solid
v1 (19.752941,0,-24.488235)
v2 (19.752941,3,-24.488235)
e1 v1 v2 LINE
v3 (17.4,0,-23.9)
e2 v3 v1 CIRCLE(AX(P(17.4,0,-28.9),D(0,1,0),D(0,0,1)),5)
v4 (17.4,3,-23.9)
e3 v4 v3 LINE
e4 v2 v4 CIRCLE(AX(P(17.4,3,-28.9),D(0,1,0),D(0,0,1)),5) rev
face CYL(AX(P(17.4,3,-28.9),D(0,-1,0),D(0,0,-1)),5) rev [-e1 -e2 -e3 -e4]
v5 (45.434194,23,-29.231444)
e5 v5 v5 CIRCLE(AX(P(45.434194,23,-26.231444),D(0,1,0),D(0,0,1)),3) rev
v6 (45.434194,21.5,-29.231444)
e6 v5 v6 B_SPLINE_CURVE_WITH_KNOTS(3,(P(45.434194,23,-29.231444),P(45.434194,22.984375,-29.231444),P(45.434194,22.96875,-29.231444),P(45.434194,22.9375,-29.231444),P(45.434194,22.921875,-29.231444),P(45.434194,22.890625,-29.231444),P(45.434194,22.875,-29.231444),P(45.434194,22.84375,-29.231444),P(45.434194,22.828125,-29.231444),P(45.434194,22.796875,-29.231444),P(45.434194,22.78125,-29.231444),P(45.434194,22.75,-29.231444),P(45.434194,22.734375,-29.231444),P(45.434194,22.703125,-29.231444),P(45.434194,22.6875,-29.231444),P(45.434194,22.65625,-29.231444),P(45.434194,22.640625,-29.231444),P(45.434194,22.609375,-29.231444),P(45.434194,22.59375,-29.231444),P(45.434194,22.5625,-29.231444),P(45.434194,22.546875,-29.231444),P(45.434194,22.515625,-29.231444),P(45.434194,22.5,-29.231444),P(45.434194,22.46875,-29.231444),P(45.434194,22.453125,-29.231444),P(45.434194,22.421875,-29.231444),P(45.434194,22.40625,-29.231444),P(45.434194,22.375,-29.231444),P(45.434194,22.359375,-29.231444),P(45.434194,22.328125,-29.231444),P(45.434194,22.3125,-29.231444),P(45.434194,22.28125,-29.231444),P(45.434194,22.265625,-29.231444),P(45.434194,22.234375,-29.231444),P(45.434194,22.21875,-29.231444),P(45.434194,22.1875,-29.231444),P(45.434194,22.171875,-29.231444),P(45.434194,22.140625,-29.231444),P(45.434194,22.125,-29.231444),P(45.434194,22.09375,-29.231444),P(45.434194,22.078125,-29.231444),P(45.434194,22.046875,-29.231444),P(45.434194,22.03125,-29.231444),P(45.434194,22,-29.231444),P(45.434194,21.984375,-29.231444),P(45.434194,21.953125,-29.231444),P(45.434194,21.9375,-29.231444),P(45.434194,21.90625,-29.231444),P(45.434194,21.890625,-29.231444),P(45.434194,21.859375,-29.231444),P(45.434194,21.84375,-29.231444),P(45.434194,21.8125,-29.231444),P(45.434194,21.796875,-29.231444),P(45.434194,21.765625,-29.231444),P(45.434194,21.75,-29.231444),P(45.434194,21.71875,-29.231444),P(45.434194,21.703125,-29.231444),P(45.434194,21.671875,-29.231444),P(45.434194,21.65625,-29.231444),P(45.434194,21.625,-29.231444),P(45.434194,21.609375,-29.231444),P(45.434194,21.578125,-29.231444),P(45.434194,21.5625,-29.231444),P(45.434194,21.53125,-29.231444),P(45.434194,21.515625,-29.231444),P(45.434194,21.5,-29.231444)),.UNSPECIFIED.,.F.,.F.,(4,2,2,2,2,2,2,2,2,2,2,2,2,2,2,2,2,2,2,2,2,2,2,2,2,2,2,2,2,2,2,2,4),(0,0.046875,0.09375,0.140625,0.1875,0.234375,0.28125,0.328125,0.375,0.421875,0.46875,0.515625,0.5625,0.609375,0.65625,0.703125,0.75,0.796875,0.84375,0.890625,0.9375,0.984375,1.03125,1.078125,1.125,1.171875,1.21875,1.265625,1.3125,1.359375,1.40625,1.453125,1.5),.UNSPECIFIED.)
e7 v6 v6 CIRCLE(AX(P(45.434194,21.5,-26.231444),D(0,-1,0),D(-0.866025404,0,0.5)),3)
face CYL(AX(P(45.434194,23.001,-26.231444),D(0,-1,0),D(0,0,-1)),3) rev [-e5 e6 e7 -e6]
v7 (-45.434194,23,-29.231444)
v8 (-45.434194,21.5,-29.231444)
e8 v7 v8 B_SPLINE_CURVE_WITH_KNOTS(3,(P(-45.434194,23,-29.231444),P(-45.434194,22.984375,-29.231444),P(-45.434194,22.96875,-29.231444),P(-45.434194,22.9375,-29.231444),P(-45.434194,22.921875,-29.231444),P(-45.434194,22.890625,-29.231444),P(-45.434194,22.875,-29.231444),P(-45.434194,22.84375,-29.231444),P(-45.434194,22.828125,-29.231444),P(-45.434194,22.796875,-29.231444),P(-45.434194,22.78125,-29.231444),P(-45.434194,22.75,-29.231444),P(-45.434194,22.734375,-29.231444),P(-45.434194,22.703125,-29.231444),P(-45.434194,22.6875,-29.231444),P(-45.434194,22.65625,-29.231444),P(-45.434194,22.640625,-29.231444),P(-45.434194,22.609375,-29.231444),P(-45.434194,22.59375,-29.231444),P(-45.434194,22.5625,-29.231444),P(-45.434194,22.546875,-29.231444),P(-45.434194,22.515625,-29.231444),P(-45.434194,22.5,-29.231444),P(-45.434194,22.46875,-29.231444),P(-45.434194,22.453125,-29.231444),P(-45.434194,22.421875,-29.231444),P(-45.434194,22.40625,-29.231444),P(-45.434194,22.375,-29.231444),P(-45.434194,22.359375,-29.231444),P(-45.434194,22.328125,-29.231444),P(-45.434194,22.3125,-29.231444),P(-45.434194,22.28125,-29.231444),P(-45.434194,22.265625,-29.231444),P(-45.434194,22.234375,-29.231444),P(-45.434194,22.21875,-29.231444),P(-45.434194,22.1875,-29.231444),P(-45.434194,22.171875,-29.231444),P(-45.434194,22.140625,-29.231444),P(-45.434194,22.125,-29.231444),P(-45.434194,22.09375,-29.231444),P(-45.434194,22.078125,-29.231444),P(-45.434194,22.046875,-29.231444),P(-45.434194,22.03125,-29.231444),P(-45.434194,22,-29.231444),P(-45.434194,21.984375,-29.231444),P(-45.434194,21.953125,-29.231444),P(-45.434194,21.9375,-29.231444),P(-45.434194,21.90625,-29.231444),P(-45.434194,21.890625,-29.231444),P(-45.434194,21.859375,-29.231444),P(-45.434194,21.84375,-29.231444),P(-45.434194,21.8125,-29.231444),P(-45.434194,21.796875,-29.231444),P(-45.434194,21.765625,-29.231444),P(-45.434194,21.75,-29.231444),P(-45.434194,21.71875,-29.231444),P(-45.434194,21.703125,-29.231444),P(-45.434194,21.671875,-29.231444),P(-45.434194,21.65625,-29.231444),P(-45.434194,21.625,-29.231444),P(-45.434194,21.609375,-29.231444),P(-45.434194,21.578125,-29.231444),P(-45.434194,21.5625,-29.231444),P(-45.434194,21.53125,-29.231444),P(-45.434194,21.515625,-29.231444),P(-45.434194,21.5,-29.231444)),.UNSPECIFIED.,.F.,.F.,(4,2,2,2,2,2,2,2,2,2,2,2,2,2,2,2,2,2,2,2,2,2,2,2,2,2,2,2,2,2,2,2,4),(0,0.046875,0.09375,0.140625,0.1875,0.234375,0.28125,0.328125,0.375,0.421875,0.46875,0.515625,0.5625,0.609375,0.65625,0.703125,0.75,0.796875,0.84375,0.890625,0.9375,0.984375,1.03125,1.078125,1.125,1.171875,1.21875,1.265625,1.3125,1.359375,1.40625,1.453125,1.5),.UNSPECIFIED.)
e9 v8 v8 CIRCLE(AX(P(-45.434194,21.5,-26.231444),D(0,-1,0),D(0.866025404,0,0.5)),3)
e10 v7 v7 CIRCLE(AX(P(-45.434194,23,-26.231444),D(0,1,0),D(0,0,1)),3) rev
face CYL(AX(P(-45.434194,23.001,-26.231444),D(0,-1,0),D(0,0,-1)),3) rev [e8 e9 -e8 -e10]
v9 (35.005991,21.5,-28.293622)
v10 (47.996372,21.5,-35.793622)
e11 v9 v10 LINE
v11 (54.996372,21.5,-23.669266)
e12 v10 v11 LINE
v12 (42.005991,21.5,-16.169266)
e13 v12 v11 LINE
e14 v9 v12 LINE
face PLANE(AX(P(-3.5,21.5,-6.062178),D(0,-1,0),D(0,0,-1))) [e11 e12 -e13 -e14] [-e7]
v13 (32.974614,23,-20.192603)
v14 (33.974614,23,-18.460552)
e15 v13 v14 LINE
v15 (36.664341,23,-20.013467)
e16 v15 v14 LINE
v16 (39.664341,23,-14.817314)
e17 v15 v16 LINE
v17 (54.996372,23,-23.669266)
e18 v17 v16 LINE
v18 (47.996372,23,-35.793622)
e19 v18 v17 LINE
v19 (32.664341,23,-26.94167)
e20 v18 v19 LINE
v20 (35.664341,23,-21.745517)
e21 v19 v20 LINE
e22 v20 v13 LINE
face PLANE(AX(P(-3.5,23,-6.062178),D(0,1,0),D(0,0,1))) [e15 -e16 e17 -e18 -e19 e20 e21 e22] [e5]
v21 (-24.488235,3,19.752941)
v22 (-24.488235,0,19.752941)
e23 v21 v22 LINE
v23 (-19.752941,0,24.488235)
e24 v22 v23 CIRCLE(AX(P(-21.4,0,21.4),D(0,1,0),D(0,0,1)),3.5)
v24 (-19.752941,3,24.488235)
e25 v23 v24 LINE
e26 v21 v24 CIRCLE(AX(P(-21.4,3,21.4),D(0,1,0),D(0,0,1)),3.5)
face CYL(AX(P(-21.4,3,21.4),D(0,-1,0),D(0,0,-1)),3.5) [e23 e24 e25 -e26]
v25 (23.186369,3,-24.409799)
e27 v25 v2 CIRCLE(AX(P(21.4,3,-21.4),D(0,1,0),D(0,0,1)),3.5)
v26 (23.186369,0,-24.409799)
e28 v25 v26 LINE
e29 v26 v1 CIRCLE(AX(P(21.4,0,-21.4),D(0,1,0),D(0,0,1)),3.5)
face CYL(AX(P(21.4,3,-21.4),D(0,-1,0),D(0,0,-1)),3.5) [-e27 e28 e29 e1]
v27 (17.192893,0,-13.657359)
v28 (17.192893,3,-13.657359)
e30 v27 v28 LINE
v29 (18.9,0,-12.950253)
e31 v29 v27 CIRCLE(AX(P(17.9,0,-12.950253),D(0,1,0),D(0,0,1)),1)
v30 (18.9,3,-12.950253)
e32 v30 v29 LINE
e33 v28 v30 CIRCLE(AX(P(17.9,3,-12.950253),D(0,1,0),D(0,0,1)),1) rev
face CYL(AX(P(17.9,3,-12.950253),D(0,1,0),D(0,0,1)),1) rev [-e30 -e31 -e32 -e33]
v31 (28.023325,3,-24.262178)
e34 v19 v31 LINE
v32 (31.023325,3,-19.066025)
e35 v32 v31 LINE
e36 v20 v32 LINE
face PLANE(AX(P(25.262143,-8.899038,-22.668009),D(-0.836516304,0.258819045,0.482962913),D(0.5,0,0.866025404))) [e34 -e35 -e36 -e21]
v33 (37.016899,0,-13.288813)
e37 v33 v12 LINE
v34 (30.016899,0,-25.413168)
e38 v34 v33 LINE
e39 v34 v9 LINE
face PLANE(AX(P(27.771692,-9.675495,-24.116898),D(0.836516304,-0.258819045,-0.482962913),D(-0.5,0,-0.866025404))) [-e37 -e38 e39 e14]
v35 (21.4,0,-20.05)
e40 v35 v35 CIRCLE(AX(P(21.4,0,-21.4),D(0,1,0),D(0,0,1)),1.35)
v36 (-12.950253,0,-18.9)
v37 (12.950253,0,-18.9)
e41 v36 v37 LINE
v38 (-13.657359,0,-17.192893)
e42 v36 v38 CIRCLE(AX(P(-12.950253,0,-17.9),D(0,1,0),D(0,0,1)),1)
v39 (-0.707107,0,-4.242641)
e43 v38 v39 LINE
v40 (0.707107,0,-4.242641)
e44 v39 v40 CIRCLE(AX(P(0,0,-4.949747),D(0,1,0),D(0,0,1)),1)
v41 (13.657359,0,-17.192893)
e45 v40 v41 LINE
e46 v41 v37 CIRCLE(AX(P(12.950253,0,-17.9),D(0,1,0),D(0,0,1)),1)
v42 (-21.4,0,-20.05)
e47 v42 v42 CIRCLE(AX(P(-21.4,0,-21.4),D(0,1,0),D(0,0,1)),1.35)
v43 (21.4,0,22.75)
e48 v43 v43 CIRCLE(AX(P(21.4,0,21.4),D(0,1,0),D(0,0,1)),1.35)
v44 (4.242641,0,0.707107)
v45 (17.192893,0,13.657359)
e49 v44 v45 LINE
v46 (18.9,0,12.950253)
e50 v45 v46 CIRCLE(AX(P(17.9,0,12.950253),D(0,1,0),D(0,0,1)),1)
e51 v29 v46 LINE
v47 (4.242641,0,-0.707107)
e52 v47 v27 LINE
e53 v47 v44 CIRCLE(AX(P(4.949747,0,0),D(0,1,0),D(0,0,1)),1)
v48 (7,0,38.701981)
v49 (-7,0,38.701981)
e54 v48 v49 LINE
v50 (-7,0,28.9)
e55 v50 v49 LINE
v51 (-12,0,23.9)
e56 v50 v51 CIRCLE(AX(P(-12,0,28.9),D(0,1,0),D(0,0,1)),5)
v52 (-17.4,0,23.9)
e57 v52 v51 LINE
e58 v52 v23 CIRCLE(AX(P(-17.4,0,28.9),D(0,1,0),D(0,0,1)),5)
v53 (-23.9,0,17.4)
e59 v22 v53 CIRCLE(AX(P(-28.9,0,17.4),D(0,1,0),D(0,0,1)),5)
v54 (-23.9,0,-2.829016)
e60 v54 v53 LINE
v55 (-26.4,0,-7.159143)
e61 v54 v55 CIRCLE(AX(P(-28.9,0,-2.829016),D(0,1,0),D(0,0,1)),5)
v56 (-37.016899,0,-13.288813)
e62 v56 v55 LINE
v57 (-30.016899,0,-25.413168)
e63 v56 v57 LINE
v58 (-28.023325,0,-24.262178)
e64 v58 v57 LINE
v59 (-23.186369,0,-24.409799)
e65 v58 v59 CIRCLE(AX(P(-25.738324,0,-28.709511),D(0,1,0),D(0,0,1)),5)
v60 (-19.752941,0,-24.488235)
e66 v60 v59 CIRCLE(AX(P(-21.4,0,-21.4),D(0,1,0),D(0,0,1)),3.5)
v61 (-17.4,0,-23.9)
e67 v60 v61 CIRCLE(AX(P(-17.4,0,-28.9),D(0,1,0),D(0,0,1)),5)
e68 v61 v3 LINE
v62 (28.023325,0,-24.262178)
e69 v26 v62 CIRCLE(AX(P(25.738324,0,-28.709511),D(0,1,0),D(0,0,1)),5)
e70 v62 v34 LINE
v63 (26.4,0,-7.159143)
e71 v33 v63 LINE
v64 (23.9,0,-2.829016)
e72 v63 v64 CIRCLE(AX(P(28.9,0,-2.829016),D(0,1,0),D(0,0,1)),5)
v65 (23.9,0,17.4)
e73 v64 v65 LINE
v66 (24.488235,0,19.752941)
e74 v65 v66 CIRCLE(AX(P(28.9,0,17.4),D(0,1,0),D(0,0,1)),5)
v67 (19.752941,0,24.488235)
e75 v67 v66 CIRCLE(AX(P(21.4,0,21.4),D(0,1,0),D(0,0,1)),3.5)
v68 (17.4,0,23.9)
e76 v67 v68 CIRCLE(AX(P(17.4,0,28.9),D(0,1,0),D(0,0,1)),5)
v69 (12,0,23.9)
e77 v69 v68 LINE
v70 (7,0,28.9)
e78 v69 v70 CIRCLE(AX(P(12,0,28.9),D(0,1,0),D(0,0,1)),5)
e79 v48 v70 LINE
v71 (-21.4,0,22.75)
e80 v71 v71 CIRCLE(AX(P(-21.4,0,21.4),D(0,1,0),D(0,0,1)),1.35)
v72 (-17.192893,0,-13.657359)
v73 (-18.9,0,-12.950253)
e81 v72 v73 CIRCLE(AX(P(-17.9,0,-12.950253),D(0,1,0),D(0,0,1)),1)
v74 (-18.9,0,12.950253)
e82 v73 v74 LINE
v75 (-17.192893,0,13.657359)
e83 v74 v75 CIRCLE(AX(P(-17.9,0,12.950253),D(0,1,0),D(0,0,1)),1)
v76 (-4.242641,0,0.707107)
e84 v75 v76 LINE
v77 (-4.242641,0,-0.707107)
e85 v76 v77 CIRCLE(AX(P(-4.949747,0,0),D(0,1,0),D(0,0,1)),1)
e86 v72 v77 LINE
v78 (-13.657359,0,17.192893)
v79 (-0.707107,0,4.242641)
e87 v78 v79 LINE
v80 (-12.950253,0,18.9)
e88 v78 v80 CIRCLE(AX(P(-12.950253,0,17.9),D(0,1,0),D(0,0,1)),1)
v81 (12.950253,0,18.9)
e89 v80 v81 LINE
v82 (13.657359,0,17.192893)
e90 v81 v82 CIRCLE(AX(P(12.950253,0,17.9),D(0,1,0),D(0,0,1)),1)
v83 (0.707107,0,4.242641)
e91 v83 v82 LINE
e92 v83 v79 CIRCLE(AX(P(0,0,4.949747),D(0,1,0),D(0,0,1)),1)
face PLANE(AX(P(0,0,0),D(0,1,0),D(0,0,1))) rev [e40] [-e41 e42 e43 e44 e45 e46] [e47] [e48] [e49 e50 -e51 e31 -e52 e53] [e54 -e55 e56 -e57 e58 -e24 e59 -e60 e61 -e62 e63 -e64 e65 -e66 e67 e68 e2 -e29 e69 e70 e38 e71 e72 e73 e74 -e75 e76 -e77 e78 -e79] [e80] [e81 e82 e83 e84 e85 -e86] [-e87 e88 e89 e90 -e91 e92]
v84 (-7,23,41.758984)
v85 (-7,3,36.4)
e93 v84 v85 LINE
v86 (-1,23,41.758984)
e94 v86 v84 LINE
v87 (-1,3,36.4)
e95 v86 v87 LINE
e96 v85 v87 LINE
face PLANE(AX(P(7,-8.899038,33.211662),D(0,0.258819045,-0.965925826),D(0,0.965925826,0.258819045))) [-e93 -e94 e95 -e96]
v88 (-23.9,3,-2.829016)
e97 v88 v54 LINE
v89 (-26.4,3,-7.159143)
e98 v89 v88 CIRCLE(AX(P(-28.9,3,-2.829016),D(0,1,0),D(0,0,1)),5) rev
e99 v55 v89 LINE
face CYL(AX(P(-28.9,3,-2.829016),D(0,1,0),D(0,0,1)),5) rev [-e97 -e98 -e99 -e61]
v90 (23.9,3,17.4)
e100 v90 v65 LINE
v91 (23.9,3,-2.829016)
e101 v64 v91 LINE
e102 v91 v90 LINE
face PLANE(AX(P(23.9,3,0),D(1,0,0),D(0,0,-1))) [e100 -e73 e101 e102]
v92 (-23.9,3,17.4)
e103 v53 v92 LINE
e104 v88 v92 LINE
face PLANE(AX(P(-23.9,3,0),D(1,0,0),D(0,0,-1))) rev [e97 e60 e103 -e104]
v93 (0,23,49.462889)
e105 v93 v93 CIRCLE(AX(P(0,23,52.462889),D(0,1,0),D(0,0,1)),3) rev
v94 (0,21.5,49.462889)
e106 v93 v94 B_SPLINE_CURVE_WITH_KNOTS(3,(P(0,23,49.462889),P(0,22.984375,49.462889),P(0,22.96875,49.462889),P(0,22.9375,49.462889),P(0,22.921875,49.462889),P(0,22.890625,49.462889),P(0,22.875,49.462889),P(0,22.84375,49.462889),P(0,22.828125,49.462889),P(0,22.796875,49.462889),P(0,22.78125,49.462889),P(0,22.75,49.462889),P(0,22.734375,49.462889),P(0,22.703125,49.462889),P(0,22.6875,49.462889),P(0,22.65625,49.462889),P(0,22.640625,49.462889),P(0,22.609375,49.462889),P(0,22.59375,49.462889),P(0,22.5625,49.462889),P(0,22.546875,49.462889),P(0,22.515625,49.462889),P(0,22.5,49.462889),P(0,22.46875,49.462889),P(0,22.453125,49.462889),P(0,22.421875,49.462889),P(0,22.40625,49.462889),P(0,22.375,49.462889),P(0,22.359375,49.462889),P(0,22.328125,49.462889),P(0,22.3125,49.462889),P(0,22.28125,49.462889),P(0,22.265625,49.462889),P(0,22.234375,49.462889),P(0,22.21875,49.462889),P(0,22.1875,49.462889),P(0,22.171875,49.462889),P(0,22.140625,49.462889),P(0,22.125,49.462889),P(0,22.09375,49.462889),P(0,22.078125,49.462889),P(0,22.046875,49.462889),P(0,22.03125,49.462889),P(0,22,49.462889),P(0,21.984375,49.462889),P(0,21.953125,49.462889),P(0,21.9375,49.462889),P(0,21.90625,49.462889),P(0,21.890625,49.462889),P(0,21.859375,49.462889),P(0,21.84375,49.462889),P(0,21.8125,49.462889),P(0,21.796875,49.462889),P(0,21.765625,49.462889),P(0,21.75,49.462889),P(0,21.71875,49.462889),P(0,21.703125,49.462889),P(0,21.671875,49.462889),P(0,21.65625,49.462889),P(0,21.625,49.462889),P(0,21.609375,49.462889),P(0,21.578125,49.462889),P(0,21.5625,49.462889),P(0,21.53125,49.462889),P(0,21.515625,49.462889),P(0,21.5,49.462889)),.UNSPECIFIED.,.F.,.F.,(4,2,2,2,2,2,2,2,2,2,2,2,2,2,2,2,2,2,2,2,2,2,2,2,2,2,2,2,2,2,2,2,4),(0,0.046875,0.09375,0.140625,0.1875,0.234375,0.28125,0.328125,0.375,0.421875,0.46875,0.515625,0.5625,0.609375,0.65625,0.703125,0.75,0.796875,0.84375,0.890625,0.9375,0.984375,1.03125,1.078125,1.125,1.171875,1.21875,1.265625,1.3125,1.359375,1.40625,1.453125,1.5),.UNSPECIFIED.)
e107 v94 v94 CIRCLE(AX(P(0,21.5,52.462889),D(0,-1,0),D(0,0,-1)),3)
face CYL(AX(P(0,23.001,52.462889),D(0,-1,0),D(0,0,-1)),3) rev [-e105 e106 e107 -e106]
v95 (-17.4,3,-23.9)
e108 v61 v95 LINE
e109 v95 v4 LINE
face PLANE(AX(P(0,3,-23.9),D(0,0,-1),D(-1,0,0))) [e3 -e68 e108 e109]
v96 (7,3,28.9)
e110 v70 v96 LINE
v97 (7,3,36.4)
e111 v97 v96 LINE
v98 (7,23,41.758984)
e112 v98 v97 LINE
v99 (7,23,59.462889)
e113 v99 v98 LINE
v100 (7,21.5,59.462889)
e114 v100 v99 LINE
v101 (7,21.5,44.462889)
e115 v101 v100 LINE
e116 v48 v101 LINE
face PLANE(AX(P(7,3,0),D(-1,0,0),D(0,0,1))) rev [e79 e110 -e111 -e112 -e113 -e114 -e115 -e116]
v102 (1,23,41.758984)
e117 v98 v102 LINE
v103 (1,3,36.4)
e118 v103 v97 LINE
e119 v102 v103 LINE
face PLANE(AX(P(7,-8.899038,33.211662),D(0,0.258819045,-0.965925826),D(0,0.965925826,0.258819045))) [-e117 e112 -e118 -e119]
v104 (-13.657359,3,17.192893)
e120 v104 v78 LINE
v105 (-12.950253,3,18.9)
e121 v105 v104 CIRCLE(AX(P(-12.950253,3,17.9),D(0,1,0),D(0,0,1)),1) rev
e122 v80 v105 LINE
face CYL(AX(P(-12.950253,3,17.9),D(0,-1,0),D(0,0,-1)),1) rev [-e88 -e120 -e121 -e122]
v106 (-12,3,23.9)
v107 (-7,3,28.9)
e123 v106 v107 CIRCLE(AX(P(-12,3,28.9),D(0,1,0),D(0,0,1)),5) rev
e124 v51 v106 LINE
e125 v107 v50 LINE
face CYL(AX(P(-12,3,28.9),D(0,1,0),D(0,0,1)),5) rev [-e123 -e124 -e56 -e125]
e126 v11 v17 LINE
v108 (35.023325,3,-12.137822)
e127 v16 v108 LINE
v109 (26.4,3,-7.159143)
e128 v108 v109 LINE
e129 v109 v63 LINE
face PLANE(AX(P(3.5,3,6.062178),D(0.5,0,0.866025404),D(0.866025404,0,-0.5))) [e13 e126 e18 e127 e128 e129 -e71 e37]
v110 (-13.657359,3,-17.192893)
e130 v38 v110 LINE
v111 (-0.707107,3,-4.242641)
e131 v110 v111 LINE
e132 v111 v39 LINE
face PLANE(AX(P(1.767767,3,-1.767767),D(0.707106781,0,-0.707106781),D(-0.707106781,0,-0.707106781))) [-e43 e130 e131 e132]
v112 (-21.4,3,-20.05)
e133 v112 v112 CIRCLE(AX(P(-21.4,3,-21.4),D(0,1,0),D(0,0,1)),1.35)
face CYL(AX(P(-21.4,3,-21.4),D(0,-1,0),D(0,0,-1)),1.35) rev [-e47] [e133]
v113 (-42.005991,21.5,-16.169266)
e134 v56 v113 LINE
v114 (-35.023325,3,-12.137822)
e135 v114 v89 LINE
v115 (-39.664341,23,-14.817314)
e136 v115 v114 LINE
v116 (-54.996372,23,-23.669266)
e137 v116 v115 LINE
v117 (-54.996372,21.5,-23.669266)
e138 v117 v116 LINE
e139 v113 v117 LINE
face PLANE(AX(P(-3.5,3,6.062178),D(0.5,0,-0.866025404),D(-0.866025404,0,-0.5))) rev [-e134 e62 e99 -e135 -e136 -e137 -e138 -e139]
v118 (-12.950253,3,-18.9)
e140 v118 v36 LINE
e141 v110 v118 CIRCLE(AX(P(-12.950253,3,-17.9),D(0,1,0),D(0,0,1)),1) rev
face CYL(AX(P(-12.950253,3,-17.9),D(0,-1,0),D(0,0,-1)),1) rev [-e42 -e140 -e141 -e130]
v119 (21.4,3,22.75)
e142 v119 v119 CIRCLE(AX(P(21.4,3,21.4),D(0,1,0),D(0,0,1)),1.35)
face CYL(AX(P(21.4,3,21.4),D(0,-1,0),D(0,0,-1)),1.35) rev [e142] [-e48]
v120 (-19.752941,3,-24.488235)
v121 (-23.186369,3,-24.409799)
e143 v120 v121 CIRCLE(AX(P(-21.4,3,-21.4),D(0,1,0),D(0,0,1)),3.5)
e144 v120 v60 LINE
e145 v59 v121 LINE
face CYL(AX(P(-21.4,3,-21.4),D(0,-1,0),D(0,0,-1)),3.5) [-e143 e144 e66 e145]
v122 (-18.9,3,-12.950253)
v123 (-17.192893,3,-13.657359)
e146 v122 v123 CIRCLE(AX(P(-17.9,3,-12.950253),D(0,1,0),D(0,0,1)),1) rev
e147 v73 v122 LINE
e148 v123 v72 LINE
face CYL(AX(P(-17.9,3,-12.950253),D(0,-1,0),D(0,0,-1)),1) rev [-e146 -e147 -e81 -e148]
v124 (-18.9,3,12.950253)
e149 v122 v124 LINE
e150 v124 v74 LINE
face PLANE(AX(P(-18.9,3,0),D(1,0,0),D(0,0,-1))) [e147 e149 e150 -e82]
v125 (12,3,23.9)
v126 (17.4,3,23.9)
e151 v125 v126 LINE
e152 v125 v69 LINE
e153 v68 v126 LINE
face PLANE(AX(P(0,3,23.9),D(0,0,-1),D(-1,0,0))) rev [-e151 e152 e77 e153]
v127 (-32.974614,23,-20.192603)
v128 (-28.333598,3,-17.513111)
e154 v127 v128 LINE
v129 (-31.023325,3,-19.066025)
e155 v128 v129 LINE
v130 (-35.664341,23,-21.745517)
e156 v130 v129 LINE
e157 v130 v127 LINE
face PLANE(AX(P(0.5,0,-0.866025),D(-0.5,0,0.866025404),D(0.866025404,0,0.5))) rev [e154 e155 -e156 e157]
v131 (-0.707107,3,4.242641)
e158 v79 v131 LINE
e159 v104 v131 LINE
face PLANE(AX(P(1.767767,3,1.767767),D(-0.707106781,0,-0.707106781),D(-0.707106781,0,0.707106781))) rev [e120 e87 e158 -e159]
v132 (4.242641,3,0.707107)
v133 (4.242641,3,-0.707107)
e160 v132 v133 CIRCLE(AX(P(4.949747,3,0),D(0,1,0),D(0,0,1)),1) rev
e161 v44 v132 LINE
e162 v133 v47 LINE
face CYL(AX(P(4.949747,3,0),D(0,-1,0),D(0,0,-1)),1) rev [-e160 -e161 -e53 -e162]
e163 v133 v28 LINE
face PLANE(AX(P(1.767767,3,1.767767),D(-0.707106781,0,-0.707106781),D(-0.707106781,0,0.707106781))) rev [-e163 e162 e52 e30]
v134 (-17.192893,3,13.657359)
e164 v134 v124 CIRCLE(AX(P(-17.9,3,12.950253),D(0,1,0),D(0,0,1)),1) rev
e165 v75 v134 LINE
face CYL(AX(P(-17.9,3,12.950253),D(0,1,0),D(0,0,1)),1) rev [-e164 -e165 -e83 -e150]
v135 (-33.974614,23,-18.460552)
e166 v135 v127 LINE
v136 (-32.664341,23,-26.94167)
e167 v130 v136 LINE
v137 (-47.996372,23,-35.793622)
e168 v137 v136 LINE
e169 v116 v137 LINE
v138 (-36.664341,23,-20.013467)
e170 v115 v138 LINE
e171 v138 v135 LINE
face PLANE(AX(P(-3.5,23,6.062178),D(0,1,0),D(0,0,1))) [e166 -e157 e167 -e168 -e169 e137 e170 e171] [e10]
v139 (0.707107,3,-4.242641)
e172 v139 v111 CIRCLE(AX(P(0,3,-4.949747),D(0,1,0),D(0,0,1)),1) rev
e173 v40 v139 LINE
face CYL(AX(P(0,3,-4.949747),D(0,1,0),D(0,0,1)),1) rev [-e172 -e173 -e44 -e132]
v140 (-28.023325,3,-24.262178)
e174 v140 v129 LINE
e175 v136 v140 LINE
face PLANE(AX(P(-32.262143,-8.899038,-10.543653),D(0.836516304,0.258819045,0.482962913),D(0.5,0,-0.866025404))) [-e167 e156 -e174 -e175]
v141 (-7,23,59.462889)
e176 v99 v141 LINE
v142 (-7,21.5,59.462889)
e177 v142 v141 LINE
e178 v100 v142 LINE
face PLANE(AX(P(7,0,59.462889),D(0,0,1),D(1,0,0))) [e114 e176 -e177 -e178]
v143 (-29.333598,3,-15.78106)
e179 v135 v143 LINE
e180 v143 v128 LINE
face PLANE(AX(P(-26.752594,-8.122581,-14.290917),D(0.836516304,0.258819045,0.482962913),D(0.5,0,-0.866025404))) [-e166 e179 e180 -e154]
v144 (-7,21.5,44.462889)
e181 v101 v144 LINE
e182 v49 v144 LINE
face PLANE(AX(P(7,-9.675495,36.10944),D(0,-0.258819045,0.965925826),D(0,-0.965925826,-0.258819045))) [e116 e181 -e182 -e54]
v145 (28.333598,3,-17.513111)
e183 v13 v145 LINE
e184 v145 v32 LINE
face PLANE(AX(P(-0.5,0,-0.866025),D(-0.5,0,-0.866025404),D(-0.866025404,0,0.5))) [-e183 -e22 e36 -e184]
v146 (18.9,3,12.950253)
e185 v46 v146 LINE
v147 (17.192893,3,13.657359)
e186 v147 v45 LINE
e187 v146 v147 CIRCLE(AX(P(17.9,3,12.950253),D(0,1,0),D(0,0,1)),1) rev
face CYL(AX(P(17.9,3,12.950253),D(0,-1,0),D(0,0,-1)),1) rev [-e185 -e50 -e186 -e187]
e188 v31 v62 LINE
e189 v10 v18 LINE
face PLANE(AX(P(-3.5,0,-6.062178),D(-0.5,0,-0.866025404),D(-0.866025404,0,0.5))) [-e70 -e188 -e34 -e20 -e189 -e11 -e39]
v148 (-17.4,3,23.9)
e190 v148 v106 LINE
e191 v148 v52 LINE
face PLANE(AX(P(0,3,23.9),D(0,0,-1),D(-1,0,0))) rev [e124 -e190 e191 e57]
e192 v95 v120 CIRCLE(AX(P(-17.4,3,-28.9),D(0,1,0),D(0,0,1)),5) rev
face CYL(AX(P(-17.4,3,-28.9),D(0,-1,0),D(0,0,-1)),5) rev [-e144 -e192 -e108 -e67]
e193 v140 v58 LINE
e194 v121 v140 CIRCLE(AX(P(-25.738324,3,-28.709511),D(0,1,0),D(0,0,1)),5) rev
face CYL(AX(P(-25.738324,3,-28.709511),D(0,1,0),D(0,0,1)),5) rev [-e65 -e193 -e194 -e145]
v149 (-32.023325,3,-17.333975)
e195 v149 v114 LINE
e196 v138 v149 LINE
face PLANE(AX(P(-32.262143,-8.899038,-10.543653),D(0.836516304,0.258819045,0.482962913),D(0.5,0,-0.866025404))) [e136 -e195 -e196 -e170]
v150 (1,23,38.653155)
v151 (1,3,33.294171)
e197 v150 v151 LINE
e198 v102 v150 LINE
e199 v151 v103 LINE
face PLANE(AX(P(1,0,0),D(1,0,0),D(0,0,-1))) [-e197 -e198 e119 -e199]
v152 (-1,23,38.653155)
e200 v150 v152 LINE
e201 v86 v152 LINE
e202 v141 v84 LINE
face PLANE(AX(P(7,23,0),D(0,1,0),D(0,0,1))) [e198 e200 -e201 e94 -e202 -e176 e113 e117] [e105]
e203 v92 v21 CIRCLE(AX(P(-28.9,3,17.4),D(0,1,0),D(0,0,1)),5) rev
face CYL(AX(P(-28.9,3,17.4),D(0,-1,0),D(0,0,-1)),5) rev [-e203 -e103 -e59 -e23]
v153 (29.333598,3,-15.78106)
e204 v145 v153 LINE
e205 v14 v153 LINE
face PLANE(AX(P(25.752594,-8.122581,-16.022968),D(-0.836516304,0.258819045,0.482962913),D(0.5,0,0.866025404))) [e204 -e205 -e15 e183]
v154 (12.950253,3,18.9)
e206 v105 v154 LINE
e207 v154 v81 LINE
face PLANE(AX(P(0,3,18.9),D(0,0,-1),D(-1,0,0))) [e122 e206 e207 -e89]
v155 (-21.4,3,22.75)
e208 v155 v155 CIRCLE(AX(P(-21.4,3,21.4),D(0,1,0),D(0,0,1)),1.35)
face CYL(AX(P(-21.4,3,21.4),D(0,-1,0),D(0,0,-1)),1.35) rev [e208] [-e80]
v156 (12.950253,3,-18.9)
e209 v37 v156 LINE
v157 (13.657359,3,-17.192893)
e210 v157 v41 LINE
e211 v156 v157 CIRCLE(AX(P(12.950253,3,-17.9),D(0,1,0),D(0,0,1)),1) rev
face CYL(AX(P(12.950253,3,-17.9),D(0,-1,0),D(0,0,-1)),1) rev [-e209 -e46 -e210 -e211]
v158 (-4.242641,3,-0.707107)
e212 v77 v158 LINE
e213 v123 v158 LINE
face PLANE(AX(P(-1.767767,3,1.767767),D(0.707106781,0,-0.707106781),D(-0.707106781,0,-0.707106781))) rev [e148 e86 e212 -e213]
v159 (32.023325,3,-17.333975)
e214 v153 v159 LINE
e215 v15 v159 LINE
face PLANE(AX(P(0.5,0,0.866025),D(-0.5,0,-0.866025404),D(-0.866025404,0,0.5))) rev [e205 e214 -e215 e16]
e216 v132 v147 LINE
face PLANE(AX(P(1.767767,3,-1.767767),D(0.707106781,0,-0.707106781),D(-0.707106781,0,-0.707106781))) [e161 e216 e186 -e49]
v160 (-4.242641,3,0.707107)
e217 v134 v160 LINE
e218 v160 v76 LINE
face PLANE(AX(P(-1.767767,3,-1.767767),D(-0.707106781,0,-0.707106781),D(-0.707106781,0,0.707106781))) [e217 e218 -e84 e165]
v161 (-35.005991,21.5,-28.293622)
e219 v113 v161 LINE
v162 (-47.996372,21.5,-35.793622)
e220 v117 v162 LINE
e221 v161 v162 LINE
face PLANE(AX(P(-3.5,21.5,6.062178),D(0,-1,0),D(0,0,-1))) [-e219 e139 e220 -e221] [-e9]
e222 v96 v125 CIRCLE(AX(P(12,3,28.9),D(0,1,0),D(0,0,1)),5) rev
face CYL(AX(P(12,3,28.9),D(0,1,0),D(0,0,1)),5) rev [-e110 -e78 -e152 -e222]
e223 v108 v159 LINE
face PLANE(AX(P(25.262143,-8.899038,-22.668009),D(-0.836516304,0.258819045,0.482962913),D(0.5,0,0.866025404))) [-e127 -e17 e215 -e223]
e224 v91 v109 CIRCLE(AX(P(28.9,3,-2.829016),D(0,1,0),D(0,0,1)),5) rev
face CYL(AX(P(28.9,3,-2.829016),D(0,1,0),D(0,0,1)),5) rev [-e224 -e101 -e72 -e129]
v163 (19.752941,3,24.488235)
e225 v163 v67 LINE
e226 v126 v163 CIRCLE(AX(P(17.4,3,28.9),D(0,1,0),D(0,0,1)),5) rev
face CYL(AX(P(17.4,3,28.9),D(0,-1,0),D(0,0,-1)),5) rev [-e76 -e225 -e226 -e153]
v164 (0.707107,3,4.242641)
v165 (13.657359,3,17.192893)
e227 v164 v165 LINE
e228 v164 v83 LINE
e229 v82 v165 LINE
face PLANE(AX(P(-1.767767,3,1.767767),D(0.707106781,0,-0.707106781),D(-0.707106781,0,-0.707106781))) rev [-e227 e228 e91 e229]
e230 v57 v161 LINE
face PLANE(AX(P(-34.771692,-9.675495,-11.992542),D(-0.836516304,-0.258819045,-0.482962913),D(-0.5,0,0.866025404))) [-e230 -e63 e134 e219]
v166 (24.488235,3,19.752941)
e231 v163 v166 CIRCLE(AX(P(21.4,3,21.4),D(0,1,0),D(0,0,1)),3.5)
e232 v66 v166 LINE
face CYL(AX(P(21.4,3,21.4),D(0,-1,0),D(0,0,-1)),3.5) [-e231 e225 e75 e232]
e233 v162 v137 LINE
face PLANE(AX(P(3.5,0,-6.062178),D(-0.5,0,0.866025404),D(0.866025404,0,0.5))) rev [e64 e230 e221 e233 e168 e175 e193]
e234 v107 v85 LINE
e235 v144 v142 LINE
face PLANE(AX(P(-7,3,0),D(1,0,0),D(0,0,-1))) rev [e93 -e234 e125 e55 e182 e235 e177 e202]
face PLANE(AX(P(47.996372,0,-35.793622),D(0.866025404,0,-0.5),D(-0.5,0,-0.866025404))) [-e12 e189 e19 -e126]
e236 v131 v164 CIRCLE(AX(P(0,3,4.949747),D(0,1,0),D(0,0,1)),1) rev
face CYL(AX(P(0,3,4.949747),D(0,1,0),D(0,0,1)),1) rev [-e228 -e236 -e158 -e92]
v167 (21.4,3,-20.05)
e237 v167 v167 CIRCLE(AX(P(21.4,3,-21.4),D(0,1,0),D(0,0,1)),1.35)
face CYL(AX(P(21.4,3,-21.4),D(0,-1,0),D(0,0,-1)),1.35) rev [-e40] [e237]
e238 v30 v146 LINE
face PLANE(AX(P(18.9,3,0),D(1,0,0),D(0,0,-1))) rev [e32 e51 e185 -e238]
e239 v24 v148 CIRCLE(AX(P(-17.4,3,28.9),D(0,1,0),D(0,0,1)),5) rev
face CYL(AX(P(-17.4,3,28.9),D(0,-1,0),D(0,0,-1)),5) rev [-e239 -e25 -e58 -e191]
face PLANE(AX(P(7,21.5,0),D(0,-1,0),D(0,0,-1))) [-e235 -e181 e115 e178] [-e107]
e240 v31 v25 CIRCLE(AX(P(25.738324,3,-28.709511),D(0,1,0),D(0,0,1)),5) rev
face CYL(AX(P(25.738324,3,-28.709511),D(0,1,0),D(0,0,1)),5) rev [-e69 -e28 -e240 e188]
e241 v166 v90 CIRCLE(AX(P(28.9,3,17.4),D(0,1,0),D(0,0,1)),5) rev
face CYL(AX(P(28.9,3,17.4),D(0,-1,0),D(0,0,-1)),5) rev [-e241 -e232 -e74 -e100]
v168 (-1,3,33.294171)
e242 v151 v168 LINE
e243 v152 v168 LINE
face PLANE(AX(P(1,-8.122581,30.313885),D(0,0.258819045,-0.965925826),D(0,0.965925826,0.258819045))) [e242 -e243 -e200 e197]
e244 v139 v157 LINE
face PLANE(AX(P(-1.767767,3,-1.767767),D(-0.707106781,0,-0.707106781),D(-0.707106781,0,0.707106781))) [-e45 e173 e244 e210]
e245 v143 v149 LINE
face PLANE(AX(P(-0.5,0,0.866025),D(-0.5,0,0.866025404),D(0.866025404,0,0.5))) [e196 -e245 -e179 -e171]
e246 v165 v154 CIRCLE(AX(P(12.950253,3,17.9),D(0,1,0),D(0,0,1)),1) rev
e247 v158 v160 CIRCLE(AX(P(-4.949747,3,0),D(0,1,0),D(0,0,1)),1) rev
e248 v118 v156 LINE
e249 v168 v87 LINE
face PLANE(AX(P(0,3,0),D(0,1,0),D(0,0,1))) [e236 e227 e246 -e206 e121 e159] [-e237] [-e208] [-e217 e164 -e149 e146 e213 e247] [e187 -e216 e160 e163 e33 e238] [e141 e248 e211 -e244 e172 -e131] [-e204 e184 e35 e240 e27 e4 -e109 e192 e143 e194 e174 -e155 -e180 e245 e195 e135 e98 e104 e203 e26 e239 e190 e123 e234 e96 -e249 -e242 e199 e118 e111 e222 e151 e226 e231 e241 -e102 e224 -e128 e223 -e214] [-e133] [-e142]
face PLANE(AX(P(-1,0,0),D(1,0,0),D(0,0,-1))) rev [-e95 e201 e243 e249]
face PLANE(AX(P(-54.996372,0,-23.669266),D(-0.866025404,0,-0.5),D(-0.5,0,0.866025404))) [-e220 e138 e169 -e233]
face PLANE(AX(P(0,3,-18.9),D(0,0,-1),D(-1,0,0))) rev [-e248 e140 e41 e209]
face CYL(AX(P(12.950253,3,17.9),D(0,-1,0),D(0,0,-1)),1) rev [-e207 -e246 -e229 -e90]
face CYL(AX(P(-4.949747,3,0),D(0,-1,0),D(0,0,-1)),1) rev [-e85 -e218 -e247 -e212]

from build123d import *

# Parameters (mm, degrees)
SKETCH1_R           = 1.35
BOSS_EXTRUDE1_DEPTH = 3
FILLET1_R           = 5
FILLET2_R           = 1
BOSS_EXTRUDE2_DEPTH = 7
BOSS_EXTRUDE3_DEPTH = 1
CUT_EXTRUDE1_REACH  = 74.282
SKETCH3_R           = 3
CIRPATTERN3_COUNT   = 3


with BuildPart() as part:
    # Sketch1 → Boss-Extrude1 (new body)
    with BuildSketch(Plane(origin=(0, 0, 0), x_dir=(1, 0, 0), z_dir=(0, 1, 0))):
        with BuildLine():
            ThreePointArc((-18.950510257, 23.9), (-22.286742625, 24.785806775), (-24.760474821, 22.378370572))
            Line((-24.760474821, 22.378370572), (-28.023324698, 24.262177826))
            Line((-28.023324698, 24.262177826), (-35.023324698, 12.137822174))
            Line((-35.023324698, 12.137822174), (-23.9, 5.715767665))
            Line((-23.9, 5.715767665), (-23.9, -18.950510257))
            ThreePointArc((-23.9, -18.950510257), (-23.874873734, -23.874873734), (-18.950510257, -23.9))
            Line((-18.950510257, -23.9), (-7, -23.9))
            Line((-7, -23.9), (-7, -36.4))
            Line((-7, -36.4), (7, -36.4))
            Line((7, -36.4), (7, -23.9))
            Line((7, -23.9), (18.950510257, -23.9))
            ThreePointArc((18.950510257, -23.9), (23.874873734, -23.874873734), (23.9, -18.950510257))
            Line((23.9, -18.950510257), (23.9, 5.715767665))
            Line((23.9, 5.715767665), (35.023324698, 12.137822174))
            Line((35.023324698, 12.137822174), (28.023324698, 24.262177826))
            Line((28.023324698, 24.262177826), (24.760474821, 22.378370572))
            ThreePointArc((24.760474821, 22.378370572), (22.286742625, 24.785806775), (18.950510257, 23.9))
            Line((18.950510257, 23.9), (-18.950510257, 23.9))
        make_face()
        with Locations(Location((-21.4, -21.4, 0), (0, 0, 270))):
            Circle(SKETCH1_R, mode=Mode.SUBTRACT)
        Polygon((15.364466094, -18.9), (-15.364466094, -18.9), (0, -3.535533906), align=None, mode=Mode.SUBTRACT)
        with Locations(Location((21.4, -21.4, 0), (0, 0, 270))):
            Circle(SKETCH1_R, mode=Mode.SUBTRACT)
        Polygon((-3.535533906, 0), (-18.9, -15.364466094), (-18.9, 15.364466094), align=None, mode=Mode.SUBTRACT)
        with Locations(Location((-21.4, 21.4, 0), (0, 0, 270))):
            Circle(SKETCH1_R, mode=Mode.SUBTRACT)
        Polygon((18.9, -15.364466094), (3.535533906, 0), (18.9, 15.364466094), align=None, mode=Mode.SUBTRACT)
        Polygon((0, 3.535533906), (-15.364466094, 18.9), (15.364466094, 18.9), align=None, mode=Mode.SUBTRACT)
        with Locations(Location((21.4, 21.4, 0), (0, 0, 270))):
            Circle(SKETCH1_R, mode=Mode.SUBTRACT)
    extrude(amount=BOSS_EXTRUDE1_DEPTH)

    # Fillet1
    # the kernel refuses this fillet: 5 mm, written as the material it adds along each edge
    with BuildSketch(Plane(origin=(7, 0, 23.9), x_dir=(0, 0, 1), z_dir=(0, 1, 0)), Plane(origin=(-7, 0, 23.9), x_dir=(-1, 0, 0), z_dir=(0, 1, 0))) as fillet1_piece_1:
        with BuildLine():
            CenterArc((FILLET1_R, FILLET1_R), FILLET1_R, 180, 90)
            Line((0, FILLET1_R), (-FILLET1_R * 0.02, FILLET1_R))
            Line((-FILLET1_R * 0.02, FILLET1_R), (-FILLET1_R * 0.02, -FILLET1_R * 0.02))
            Line((-FILLET1_R * 0.02, -FILLET1_R * 0.02), (FILLET1_R, -FILLET1_R * 0.02))
            Line((FILLET1_R, -FILLET1_R * 0.02), (FILLET1_R, 0))
        make_face()
    extrude(amount=3)
    with BuildSketch(Plane(origin=(23.9, 0, 18.950510257), x_dir=(0.5912237553807399, 0, 0.8065075765753815), z_dir=(0, 1, 0)), Plane(origin=(-18.950510257, 0, 23.9), x_dir=(-0.806507576575308, 0, 0.5912237553808403), z_dir=(0, 1, 0)), Plane(origin=(18.950510257, 0, -23.9), x_dir=(0.8065075765752107, 0, -0.591223755380973), z_dir=(0, 1, 0))) as fillet1_piece_2:
        with BuildLine():
            CenterArc((1.705620507, 4.94923638), FILLET1_R, 233.756102233, 28.072486936)
            Line((-1.25049827, 0.916698497), (-1.309620646, 0.836047739))
            Line((-1.309620646, 0.836047739), (-0.059122376, -0.080650758))
            Line((-0.059122376, -0.080650758), (0.014213504, -0.098984728))
            ThreePointArc((0.014213504, -0.098984728), (0.497472648, -0.064465466), (0.980731791, -0.098984728))
            Line((0.980731791, -0.098984728), (0.994945296, 0))
        make_face()
    extrude(amount=3)
    with BuildSketch(Plane(origin=(18.950510257, 0, 23.9), x_dir=(-1, 0, 0), z_dir=(0, 1, 0)), Plane(origin=(-23.9, 0, 18.950510257), x_dir=(0, 0, -1), z_dir=(0, 1, 0)), Plane(origin=(-18.950510257, 0, -23.9), x_dir=(1, 0, 0), z_dir=(0, 1, 0))) as fillet1_piece_3:
        with BuildLine():
            CenterArc((1.550510257, 5), FILLET1_R, 241.927513064, 28.072486936)
            Line((-0.802430919, 0.588235294), (-0.849489743, 0.5))
            ThreePointArc((-0.849489743, 0.5), (-0.439328974, 0.24212576), (-0.069985421, -0.071428571))
            Line((-0.069985421, -0.071428571), (0, -0.1))
            Line((0, -0.1), (1.550510257, -0.1))
            Line((1.550510257, -0.1), (1.550510257, 0))
        make_face()
    extrude(amount=3)
    with BuildSketch(Plane(origin=(-23.9, 0, -5.715767665), x_dir=(-0.8660254037844421, 0, -0.49999999999999417), z_dir=(0, 1, 0)), Plane(origin=(23.9, 0, -5.715767665), x_dir=(0, 0, 1), z_dir=(0, 1, 0))) as fillet1_piece_4:
        with BuildLine():
            CenterArc((FILLET1_R * 0.57735026919, FILLET1_R), FILLET1_R, 210, 60)
            Line((-FILLET1_R * 0.288675134595, FILLET1_R * 0.5), (-FILLET1_R * 0.30599564267, FILLET1_R * 0.49))
            Line((-FILLET1_R * 0.30599564267, FILLET1_R * 0.49), (-FILLET1_R * 0.0115470053838, -FILLET1_R * 0.02))
            Line((-FILLET1_R * 0.0115470053838, -FILLET1_R * 0.02), (FILLET1_R * 0.57735026919, -FILLET1_R * 0.02))
            Line((FILLET1_R * 0.57735026919, -FILLET1_R * 0.02), (FILLET1_R * 0.57735026919, 0))
        make_face()
    extrude(amount=3)
    with BuildSketch(Plane(origin=(24.760474821, 0, -22.378370572), x_dir=(-0.6125107821213894, 0, -0.7904622329909531), z_dir=(0, 1, 0))) as fillet1_piece_5:
        with BuildLine():
            CenterArc((4.405584254, -4.650844222), FILLET1_R, 111.538849964, 57.883583887)
            Line((-0.509452241, -3.733011854), (-0.607752971, -3.714655207))
            ThreePointArc((-0.607752971, -3.714655207), (-0.353807697, -1.852984049), (-0.099081577, 0.013521878))
            Line((-0.099081577, 0.013521878), (0.036713202, 0.093016884))
            ThreePointArc((0.036713202, 0.093016884), (1.284962074, -0.144409045), (2.533210946, 0.093016884))
            Line((2.533210946, 0.093016884), (2.569924148, 0))
        make_face()
    extrude(amount=3)
    with BuildSketch(Plane(origin=(-24.760474821, 0, -22.378370572), x_dir=(0.6125107821216187, 0, -0.7904622329907753), z_dir=(0, 1, 0))) as fillet1_piece_6:
        with BuildLine():
            CenterArc((4.405584254, 4.650844222), FILLET1_R, 190.577566149, 57.883583887)
            Line((-0.509452241, 3.733011854), (-0.607752971, 3.714655207))
            ThreePointArc((-0.607752971, 3.714655207), (-0.353807697, 1.852984049), (-0.099081577, -0.013521878))
            Line((-0.099081577, -0.013521878), (0.036713202, -0.093016884))
            ThreePointArc((0.036713202, -0.093016884), (1.284962074, 0.144409045), (2.533210946, -0.093016884))
            Line((2.533210946, -0.093016884), (2.569924148, 0))
        make_face()
    extrude(amount=3)

    # Fillet2
    fillet2_edges = [part.edges().sort_by_distance(p)[0] for p in [
        (15.364466094, 1.5, -18.9),
        (-15.364466094, 1.5, -18.9),
        (0, 1.5, -3.535533906),
        (-18.9, 1.5, 15.364466094),
        (-3.535533906, 1.5, 0),
        (-18.9, 1.5, -15.364466094),
        (18.9, 1.5, 15.364466094),
        (18.9, 1.5, -15.364466094),
        (3.535533906, 1.5, 0),
        (-15.364466094, 1.5, 18.9),
        (15.364466094, 1.5, 18.9),
        (0, 1.5, 3.535533906),
    ]]
    fillet(fillet2_edges, radius=FILLET2_R)

    # Sketch2 → Boss-Extrude2 (add, symmetric)
    with BuildSketch(Plane(origin=(0, 0, 0), x_dir=(0, 0, -1), z_dir=(1, 0, 0))):
        Polygon((-36.4, 3), (-36.4, 0), (-38.701980964, 0), (-44.462888601, 21.5), (-59.462888601, 21.5), (-59.462888601, 23), (-41.758983849, 23), align=None)
    boss_extrude2 = extrude(amount=BOSS_EXTRUDE2_DEPTH, both=True)

    # Sketch2<3> → Boss-Extrude3 (add, symmetric)
    with BuildSketch(Plane(origin=(0, 0, 0), x_dir=(0, 0, -1), z_dir=(1, 0, 0))):
        Polygon((-33.294171459, 3), (-36.4, 3), (-41.758983849, 23), (-38.653155307, 23), align=None)
    boss_extrude3 = extrude(amount=BOSS_EXTRUDE3_DEPTH, both=True)

    # Sketch3 → Cut-Extrude1 (cut, up to next)
    with BuildSketch(Plane.XZ.offset(-21.5), mode=Mode.PRIVATE) as cut_extrude1_sk1:
        with Locations(Location((0, 52.462888601, 0), (0, 0, 270))):
            Circle(SKETCH3_R)
    cut_extrude1_tool1 = extrude(cut_extrude1_sk1.sketch, amount=-CUT_EXTRUDE1_REACH, mode=Mode.PRIVATE) & part.part
    cut_extrude1 = cut_extrude1_tool1.solids().sort_by_distance((0, 21.5, 52.462889))[0]
    add(cut_extrude1, mode=Mode.SUBTRACT)

    # CirPattern3: Boss-Extrude2, Boss-Extrude3, Cut-Extrude1 ×3 about axis
    cirpattern3_axis = Axis((0, 0, 0), (0, 1, 0))
    add([boss_extrude2.rotate(cirpattern3_axis, i * 360 / CIRPATTERN3_COUNT) for i in range(1, CIRPATTERN3_COUNT)])
    add([boss_extrude3.rotate(cirpattern3_axis, i * 360 / CIRPATTERN3_COUNT) for i in range(1, CIRPATTERN3_COUNT)])
    add([cut_extrude1.rotate(cirpattern3_axis, i * 360 / CIRPATTERN3_COUNT) for i in range(1, CIRPATTERN3_COUNT)], mode=Mode.SUBTRACT)


solid = part.part
